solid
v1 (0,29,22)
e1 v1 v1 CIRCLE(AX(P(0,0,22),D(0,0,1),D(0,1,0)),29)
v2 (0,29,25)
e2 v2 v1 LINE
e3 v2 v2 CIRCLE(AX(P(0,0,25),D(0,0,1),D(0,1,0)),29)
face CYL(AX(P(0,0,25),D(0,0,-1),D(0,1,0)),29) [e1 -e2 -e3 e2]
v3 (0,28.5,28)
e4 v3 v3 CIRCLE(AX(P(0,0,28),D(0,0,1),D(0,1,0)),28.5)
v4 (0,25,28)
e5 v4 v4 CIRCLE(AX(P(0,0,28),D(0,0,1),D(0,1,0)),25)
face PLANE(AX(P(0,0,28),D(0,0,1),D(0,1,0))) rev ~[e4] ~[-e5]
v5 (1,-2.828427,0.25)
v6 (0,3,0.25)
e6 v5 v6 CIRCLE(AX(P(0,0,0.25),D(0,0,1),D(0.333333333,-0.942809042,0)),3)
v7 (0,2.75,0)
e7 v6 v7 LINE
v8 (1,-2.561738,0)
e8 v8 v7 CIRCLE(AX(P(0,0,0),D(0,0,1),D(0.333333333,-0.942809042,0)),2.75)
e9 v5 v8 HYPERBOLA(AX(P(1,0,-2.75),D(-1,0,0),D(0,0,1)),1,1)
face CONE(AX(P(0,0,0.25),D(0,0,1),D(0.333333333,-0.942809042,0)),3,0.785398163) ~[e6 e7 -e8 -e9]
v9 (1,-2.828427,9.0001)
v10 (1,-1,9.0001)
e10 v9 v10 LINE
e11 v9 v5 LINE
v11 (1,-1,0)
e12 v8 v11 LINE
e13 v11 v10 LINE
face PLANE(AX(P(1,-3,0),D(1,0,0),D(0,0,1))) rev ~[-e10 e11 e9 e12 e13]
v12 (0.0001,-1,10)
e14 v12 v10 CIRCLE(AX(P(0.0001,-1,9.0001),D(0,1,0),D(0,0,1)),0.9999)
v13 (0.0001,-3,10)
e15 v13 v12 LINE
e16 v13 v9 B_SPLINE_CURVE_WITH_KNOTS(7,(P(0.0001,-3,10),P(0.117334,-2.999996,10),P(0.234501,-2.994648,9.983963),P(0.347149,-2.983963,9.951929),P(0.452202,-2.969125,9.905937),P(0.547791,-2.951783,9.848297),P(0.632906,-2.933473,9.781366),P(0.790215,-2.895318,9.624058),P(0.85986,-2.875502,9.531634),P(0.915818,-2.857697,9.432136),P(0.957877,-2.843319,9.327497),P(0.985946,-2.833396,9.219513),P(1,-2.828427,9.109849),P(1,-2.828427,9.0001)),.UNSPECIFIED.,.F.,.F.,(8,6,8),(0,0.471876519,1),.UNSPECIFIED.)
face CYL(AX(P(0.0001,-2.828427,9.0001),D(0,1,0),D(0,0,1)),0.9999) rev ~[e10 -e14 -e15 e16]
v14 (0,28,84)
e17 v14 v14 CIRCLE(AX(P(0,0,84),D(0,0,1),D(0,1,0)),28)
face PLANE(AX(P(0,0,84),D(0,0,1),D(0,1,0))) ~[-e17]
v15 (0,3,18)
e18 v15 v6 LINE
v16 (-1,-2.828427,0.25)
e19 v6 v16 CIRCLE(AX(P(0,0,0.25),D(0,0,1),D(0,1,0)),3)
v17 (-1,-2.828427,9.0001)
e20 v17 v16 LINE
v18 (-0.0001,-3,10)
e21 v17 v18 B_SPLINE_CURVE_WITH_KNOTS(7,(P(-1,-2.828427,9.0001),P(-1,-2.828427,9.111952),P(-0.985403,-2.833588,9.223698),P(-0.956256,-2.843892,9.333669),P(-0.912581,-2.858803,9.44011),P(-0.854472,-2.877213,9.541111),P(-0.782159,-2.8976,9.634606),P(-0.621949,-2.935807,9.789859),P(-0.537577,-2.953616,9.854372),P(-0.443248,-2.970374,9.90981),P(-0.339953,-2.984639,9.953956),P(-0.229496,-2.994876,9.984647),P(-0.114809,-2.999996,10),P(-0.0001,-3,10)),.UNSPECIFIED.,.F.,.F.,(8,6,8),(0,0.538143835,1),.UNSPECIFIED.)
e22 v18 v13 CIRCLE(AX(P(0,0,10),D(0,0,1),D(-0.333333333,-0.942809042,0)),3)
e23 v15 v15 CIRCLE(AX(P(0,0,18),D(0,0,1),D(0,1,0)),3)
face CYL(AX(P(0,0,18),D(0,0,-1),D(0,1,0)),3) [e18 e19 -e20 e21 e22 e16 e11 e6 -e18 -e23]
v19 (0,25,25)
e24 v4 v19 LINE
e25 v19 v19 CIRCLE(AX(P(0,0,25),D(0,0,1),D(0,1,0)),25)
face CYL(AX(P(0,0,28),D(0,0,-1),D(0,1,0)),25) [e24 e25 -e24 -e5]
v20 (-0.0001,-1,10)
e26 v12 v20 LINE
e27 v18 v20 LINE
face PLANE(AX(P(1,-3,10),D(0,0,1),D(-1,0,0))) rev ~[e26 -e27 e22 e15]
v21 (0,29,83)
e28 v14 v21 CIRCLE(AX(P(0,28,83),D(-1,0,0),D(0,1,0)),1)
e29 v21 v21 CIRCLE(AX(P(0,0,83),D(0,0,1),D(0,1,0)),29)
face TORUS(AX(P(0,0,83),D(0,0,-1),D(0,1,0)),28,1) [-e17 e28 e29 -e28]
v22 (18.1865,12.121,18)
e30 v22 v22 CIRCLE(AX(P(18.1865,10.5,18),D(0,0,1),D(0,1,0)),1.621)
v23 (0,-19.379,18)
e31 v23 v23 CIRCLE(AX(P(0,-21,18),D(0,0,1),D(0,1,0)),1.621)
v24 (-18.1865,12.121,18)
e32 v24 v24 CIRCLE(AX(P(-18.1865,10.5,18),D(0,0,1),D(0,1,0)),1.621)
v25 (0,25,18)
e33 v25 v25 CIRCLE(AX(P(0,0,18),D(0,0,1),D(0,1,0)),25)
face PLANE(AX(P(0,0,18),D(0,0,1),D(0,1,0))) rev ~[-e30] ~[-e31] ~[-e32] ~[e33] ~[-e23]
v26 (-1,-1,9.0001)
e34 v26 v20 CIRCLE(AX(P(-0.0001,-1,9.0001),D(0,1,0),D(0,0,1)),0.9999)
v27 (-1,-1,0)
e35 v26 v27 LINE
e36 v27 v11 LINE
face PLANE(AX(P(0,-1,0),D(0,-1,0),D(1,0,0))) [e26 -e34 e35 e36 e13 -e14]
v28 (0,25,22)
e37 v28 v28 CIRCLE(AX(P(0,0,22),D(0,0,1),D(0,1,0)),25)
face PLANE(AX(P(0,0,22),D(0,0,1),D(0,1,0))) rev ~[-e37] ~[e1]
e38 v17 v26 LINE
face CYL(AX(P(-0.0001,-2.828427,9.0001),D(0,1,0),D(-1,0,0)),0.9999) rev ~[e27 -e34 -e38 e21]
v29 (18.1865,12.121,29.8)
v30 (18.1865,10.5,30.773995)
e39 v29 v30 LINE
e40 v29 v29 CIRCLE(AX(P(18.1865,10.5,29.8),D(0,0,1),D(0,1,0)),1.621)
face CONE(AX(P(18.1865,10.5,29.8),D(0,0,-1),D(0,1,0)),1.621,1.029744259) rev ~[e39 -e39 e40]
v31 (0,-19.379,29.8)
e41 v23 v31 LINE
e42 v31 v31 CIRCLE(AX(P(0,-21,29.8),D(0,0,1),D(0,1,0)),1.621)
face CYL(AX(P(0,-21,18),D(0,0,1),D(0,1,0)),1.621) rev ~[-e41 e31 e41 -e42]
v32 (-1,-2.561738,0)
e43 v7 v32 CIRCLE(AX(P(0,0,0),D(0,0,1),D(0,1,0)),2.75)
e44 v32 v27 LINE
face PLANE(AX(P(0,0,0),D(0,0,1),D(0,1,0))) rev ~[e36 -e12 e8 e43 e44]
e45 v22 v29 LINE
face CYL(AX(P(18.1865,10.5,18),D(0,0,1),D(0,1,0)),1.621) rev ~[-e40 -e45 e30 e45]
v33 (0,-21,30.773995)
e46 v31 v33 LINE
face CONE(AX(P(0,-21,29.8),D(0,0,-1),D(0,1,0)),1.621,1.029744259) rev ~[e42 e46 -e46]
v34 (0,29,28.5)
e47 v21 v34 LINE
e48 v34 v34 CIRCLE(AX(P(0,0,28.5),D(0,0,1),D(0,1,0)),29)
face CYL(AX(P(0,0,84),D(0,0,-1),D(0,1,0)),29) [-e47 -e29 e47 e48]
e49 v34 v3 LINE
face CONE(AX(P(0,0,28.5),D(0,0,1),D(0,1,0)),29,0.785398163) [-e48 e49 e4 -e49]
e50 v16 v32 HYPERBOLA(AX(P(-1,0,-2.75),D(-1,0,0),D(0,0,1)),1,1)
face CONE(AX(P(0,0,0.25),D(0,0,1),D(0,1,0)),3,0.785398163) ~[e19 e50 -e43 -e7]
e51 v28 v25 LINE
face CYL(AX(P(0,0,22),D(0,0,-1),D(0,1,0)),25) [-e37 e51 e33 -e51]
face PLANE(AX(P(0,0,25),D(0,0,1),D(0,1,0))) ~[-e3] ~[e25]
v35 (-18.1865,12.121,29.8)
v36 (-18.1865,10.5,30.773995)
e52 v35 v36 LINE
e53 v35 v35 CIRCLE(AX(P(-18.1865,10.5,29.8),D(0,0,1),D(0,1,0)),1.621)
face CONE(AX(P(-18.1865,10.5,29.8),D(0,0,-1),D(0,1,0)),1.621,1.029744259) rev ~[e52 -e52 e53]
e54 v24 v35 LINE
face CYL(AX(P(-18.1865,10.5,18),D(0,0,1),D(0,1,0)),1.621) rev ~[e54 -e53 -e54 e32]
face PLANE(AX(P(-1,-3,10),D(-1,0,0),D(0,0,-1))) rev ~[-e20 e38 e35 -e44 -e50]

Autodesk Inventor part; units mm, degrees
ref_plane "YZ Plane" through (0, 0, 0) normal (1, 0, 0) x (0, 1, 0)
ref_plane "XZ Plane" through (0, 0, 0) normal (0, 1, 0) x (-1, 0, 0)
sketch "Sketch1" plane through (0, 0, 0) normal (1, 0, 0) x (0, 1, 0)
  line L0 (0, 0) -> (0, 84)
  line L1 (0, 84) -> (29, 84)
  line L2 (29, 84) -> (29, 28)
  line L3 (29, 28) -> (25, 28)
  line L4 (25, 28) -> (25, 25)
  line L5 (25, 25) -> (29, 25)
  line L6 (29, 25) -> (29, 22)
  line L7 (29, 22) -> (25, 22)
  line L8 (25, 22) -> (25, 18)
  line L9 (25, 18) -> (3, 18)
  line L10 (3, 18) -> (3, 0)
  line L11 (3, 0) -> (0, 0)
  dimension "d0" = 84
  dimension "d1" = 29
  dimension "d2" = 56
  dimension "d5" = 4
  dimension "d6" = 3
  dimension "d7" = 4
  dimension "d8" = 3
  dimension "d9" = 4
  dimension "d10" = 4
  dimension "d11" = 22
revolve "Revolution1" add sketch "Sketch1" angle 360 about axis through (0, 0, 0) along (0, 0, 1)
fillet "Fillet1" radius 1 1 edges at (0, -29, 84)
chamfer "Chamfer1" distance 0.5 angle 45 1 edges at (0, -29, 28)
sketch "Sketch2" plane through (0, 0, 18) normal (0, 0, -1) x (-1, 0, 0)
  line L0 (0, 0) -> (0, -21)
  circle A0 centre (0, -21) radius 1
  circle A1 centre (18.1865, 10.5) radius 1
  circle A2 centre (-18.1865, 10.5) radius 1
  dimension "d17" = 21
  dimension "d18" = 2
  dimension "d21" = 360
extrude "Extrusion1" cut sketch "Sketch2" against normal blind 8
hole "Hole1" at (0, -21, 18) direction (0, 0, 1) diameter 3.242 depth 11.8 tip angle 118 thread size "M4x0.7" class "6H" standard "ISO Metric profile"
hole "Hole2" at (18.1865, 10.5, 18) direction (0, 0, 1) diameter 3.242 depth 11.8 tip angle 118 thread size "M4x0.7" class "6H" standard "ISO Metric profile"
hole "Hole3" at (-18.1865, 10.5, 18) direction (0, 0, 1) diameter 3.242 depth 11.8 tip angle 118 thread size "M4x0.7" class "6H" standard "ISO Metric profile"
sketch "Sketch5" plane through (0, 0, 0) normal (0, 0, -1) x (-1, 0, 0)
  point P0 (0, 0)
sketch "Sketch6" plane through (0, 0, 0) normal (0, 0, -1) x (-1, 0, 0)
  line L0 (0, 0) -> (0, -3)
  dimension "d62" = 3
ref_plane "Work Plane2" through (0, -3, 0) normal (0, -1, 0) x (1, 0, 0)
sketch "Sketch7" plane through (0, -3, 0) normal (0, -1, 0) x (1, 0, 0)
  line L0 (-3, 18) -> (-3, 0) projected
  line L1 (3, 18) -> (3, 0) projected
  line L2 (-3, 0) -> (3, 0) projected
  line L3 (-25, 18) -> (25, 18) projected
  line L4 (-1, 0) -> (1, 0)
  line L5 (1, 0) -> (1, 10)
  line L6 (1, 10) -> (-1, 10)
  line L7 (-1, 10) -> (-1, 0)
  point P0 (0, 0)
  dimension "d63" = 10
  dimension "d64" = 2
  dimension "d66" = 2
extrude "Extrusion3" cut sketch "Sketch7" against normal blind 2 contours L7 L6 L5 L2
chamfer "Chamfer3" distance 0.25 angle 45 2 edges at (2.9568, 0.5073, 0) (-2.9568, 0.5073, 0)
fillet "Fillet2" radius 1 2 edges at (-1, -1.9142, 10) (1, -1.9142, 10)
properties part number "Tachometer"
